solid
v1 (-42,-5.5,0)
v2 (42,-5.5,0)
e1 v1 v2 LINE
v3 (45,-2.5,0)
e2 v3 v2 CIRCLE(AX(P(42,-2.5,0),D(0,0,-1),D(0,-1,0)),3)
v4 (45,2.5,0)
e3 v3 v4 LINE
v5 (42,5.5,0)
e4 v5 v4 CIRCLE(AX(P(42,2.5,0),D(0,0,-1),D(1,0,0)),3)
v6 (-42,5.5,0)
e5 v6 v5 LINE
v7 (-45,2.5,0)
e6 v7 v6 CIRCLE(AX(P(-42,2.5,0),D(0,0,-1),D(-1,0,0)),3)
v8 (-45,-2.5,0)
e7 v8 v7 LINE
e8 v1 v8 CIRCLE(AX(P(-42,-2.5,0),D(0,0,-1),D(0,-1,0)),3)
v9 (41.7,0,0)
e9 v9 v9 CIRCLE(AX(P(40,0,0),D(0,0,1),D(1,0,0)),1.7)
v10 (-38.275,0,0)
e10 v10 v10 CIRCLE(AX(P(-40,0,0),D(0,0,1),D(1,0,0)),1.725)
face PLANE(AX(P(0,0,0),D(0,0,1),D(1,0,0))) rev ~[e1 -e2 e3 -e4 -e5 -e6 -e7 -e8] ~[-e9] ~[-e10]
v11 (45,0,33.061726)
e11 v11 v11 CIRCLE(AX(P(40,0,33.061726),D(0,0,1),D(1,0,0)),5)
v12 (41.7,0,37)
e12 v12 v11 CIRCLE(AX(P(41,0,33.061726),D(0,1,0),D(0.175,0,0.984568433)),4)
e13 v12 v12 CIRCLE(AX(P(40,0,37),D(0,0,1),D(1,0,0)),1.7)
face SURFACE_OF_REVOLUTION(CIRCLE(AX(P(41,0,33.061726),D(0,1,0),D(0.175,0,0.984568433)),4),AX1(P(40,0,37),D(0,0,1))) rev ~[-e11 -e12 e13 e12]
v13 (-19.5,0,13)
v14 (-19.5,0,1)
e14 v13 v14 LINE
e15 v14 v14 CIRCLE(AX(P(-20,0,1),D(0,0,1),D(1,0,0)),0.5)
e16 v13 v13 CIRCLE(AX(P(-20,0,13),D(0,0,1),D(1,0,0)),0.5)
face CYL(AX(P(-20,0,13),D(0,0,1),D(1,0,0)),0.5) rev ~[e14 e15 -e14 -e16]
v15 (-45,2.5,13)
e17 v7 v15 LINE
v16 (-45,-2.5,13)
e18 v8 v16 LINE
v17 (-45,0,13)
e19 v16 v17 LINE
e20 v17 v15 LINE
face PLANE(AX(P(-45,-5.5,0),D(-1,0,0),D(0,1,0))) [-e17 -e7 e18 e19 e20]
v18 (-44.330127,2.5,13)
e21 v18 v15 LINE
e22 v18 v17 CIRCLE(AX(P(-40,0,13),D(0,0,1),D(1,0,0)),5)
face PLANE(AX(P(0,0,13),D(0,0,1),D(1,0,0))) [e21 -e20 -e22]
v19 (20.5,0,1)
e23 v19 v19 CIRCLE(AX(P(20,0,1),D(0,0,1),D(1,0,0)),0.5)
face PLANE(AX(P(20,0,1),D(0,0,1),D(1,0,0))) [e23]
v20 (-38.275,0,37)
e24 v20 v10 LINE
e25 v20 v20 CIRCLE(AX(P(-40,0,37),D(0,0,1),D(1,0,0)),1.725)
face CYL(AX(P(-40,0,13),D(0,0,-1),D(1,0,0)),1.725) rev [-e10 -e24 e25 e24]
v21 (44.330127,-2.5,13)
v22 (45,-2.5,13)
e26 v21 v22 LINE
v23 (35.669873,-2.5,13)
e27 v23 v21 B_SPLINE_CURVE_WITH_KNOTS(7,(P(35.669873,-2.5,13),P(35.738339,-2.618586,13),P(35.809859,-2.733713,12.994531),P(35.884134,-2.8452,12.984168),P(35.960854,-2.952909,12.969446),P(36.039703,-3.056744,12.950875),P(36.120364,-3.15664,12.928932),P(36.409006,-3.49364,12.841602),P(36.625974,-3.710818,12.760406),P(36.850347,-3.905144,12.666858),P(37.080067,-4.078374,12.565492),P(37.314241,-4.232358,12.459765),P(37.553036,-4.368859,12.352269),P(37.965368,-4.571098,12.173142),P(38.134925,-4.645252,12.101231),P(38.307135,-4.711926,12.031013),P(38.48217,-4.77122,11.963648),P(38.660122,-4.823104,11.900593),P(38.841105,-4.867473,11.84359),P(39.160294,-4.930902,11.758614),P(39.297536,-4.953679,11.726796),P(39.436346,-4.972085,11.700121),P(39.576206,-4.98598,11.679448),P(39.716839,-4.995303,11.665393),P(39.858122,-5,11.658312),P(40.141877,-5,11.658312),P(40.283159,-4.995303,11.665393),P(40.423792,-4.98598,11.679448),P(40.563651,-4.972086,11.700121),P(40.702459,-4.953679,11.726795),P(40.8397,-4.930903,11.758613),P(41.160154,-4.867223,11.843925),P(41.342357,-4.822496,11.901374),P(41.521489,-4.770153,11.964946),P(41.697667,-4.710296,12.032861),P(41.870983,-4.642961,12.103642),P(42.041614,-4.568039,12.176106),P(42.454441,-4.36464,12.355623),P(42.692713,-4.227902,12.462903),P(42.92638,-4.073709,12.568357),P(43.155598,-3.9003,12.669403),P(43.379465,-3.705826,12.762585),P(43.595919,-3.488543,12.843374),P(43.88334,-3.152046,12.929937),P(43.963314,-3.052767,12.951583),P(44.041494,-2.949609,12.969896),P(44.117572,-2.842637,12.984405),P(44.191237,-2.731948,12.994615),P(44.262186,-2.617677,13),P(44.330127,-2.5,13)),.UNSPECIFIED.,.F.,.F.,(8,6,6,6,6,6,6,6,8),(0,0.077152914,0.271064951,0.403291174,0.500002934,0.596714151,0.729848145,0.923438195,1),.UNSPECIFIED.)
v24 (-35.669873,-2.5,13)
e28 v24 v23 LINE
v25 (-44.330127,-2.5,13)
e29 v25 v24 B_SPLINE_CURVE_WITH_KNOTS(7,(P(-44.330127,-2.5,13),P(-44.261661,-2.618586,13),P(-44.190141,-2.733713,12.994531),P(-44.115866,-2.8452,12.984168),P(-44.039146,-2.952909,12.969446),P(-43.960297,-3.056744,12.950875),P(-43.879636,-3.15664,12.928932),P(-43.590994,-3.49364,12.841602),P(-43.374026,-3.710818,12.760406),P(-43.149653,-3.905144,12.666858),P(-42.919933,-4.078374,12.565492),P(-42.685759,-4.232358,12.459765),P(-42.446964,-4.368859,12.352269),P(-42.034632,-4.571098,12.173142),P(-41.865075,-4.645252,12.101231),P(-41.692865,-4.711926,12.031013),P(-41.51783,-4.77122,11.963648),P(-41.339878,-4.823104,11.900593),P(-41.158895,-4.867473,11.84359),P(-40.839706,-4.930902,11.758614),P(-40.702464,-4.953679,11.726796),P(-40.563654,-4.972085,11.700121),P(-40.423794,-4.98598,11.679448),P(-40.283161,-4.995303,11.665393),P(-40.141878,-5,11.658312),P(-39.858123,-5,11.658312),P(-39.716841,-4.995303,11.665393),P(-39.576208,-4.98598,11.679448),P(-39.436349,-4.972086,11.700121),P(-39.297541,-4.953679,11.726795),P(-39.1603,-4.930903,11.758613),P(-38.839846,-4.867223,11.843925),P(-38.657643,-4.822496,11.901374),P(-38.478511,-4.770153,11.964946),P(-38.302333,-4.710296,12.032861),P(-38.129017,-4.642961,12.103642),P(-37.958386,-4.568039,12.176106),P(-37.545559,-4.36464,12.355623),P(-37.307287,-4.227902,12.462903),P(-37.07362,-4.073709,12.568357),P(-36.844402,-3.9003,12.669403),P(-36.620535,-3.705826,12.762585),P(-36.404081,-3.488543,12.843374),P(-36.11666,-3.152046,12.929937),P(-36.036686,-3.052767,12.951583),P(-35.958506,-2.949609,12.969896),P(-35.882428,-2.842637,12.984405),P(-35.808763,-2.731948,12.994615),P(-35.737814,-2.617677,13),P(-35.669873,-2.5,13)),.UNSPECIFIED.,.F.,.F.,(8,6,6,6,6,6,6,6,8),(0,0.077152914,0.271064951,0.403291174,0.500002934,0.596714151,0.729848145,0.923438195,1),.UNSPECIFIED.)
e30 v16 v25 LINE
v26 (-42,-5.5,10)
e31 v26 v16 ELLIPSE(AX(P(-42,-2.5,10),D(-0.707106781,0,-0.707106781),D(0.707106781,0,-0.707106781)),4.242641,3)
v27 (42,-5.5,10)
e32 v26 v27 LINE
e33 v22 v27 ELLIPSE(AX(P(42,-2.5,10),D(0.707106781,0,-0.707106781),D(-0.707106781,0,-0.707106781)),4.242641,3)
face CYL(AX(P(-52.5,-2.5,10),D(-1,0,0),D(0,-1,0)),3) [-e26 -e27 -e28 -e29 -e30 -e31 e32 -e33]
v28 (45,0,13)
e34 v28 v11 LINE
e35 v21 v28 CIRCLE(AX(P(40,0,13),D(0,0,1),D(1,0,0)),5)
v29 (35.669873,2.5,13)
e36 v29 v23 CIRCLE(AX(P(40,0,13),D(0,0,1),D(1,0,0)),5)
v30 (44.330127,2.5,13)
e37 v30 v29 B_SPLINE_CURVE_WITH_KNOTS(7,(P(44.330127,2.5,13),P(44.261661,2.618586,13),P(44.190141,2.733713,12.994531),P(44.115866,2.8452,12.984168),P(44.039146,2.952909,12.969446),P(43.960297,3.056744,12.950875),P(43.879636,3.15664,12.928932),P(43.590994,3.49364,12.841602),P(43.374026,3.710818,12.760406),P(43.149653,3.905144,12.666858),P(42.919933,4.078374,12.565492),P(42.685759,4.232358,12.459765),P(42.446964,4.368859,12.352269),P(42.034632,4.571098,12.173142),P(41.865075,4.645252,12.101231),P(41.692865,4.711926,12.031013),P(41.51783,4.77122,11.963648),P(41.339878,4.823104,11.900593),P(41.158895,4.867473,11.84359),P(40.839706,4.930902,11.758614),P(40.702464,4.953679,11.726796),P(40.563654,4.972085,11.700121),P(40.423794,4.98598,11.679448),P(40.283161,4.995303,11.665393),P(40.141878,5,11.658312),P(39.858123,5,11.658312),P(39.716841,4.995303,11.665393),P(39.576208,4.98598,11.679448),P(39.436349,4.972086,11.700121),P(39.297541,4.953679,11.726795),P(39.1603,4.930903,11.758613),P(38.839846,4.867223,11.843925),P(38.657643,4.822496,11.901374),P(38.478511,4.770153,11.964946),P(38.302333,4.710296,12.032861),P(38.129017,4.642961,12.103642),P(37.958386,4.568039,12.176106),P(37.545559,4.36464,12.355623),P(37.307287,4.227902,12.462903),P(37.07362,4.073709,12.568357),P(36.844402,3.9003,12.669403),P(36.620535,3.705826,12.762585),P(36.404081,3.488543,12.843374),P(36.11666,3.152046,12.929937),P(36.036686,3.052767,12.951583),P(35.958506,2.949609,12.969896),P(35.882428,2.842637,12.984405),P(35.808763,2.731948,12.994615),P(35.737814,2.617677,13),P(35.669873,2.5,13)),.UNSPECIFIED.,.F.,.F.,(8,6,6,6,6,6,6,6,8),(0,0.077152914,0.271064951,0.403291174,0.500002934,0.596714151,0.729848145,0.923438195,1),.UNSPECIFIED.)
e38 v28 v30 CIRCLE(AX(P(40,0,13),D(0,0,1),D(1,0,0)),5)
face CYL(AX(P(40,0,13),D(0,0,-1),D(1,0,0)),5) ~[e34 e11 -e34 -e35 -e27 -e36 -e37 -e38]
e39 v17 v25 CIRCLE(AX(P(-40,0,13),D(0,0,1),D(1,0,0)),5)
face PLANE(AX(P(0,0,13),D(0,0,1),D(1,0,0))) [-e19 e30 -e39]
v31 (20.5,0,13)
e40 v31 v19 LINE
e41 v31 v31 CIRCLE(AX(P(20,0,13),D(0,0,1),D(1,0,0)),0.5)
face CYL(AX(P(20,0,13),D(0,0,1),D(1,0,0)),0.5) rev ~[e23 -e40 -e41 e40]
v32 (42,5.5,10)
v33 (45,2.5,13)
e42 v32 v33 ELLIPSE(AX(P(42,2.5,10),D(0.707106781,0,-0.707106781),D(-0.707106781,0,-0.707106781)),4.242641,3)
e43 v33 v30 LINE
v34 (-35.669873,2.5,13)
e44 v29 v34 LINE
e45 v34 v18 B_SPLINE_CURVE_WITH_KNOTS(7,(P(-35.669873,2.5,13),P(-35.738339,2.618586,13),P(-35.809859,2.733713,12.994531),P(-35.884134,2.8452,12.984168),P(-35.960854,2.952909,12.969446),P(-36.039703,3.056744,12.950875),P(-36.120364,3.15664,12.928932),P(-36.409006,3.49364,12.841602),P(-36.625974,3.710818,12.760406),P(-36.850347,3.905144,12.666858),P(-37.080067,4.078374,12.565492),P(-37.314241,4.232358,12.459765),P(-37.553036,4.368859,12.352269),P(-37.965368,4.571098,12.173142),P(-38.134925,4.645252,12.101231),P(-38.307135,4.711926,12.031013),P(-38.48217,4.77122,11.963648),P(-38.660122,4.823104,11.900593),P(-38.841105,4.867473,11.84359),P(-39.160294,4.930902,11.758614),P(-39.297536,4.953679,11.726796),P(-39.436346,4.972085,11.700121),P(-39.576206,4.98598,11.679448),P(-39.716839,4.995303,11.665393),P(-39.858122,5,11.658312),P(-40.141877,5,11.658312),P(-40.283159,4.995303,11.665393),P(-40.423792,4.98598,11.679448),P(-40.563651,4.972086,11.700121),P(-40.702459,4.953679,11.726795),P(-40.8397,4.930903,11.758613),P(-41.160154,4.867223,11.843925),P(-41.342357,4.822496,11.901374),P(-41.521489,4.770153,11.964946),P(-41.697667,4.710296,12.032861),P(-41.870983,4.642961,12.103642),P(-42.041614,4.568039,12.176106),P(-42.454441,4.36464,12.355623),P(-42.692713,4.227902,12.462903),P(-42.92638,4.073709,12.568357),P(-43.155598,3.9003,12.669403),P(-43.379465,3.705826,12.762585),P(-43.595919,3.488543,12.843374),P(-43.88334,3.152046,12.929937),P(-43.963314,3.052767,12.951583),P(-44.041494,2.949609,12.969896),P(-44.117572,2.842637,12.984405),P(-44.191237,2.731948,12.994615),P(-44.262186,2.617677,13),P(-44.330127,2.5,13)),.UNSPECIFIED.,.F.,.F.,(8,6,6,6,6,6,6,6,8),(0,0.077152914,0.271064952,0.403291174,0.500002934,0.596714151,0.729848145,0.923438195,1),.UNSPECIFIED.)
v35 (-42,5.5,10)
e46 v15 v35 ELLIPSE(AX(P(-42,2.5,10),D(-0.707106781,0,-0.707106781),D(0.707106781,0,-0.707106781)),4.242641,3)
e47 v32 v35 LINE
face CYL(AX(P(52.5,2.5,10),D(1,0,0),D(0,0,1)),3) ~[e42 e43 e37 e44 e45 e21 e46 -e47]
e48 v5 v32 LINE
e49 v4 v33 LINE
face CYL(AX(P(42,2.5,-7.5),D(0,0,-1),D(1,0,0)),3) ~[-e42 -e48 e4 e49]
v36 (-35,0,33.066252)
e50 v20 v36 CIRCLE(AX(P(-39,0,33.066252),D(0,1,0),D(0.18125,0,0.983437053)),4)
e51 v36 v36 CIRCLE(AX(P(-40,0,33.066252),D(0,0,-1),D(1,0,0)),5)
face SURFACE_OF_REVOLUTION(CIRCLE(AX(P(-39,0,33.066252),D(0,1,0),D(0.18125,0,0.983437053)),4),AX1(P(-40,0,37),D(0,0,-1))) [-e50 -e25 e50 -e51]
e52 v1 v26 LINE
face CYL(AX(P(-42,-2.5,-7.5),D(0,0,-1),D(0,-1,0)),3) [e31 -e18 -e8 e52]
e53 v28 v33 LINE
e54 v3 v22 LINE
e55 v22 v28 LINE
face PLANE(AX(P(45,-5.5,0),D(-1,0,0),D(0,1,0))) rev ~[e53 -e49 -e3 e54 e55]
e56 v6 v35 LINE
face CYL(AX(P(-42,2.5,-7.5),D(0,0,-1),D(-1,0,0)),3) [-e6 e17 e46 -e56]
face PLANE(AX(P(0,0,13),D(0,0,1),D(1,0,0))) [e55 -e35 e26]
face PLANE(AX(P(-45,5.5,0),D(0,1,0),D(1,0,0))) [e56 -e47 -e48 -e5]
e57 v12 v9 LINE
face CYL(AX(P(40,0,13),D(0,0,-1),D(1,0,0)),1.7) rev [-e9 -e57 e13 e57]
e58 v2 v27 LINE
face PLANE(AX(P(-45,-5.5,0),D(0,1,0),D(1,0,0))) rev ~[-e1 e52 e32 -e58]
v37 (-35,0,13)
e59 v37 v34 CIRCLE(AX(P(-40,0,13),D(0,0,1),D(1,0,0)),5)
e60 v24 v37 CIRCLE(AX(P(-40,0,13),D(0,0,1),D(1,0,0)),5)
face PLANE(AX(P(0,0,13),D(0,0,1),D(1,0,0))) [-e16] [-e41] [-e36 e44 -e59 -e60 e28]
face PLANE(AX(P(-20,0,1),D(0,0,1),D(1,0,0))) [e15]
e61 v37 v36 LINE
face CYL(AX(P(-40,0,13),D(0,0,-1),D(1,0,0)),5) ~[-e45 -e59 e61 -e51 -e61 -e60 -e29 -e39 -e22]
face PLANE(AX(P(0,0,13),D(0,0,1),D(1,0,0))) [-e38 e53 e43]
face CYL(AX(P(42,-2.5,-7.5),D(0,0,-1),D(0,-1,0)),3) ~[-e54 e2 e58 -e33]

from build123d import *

# Parameters (mm, degrees)
F0_W         = 90
F0_H         = 11
F0_R         = 1.725
F0_R_2       = 1.7
F1_DEPTH     = 13
F2_R         = 5
F2_R_2       = 1.7
F3_DEPTH     = 24
F4_R         = 1.725
F5_DEPTH     = 24
F6_R         = 0.5
F7_DEPTH     = 12
F8_T1_DEPTH  = 28
F8_T6_DEPTH  = 105
F8_S7_R      = 5
F8_T8_DEPTH  = 54
F8_S9_R      = 5
F8_T10_DEPTH = 54
F8_T14_DEPTH = 105
F8_S15_R     = 5
F8_T16_DEPTH = 54
F8_S17_R     = 5
F8_T18_DEPTH = 54


# Not quite as in the source:
# - a fillet or chamfer that OpenCascade refuses, or shapes differently, is made with other operations: its cross-section is extruded or revolved along the edge and cut away or added
# - a feature names something its author has since deleted; it is built from what else it names


with BuildPart() as f1:
    # F0 (on Top) → F1 (new body)
    with BuildSketch(Plane.XY):
        Rectangle(F0_W, F0_H)
        with Locations((-40, 0)):
            Circle(F0_R, mode=Mode.SUBTRACT)
        with Locations((40, 0)):
            Circle(F0_R_2, mode=Mode.SUBTRACT)
    extrude(amount=F1_DEPTH)

    # F2 (on face) → F3 (join)
    with BuildSketch(Plane.XY.offset(13)):
        with Locations((40, 0)):
            Circle(F2_R)
        with Locations((40, 0)):
            Circle(F2_R_2, mode=Mode.SUBTRACT)
    extrude(amount=F3_DEPTH)

    # F4 (on face) → F5 (join)
    with BuildSketch(Plane.XY.offset(13)):
        with BuildLine():
            ThreePointArc((-45, 0), (-40, -5), (-35, 0))
            ThreePointArc((-35, 0), (-40, 5), (-45, 0))
        make_face()
        with Locations((-40, 0)):
            Circle(F4_R, mode=Mode.SUBTRACT)
    extrude(amount=F5_DEPTH)

    # F6 (on face) → F7 (cut)
    with BuildSketch(Plane.XY.offset(13)):
        with Locations((-20, 0)):
            Circle(F6_R)
        with Locations((20, 0)):
            Circle(F6_R)
    extrude(amount=-F7_DEPTH, mode=Mode.SUBTRACT)

    # F8: fillet of radius 3 on 6 edges, made by hand

    # F8_s2 → F8_t1 (cut)
    with BuildSketch(Plane.XY.offset(-7.5)):
        with BuildLine():
            ThreePointArc((-42, -5.5), (-44.1213203436, -4.6213203436), (-45, -2.5))
            Line((-45, -2.5), (-45, -5.5))
            Line((-45, -5.5), (-42, -5.5))
        make_face()
        with BuildLine():
            ThreePointArc((-45, 2.5), (-44.1213203436, 4.6213203436), (-42, 5.5))
            Line((-42, 5.5), (-45, 5.5))
            Line((-45, 5.5), (-45, 2.5))
        make_face()
        with BuildLine():
            ThreePointArc((42, -5.5), (44.1213203436, -4.6213203436), (45, -2.5))
            Line((45, -2.5), (45, -5.5))
            Line((45, -5.5), (42, -5.5))
        make_face()
        with BuildLine():
            ThreePointArc((45, 2.5), (44.1213203436, 4.6213203436), (42, 5.5))
            Line((42, 5.5), (45, 5.5))
            Line((45, 5.5), (45, 2.5))
        make_face()
    extrude(amount=F8_T1_DEPTH, mode=Mode.SUBTRACT)


with BuildPart() as f8_tool4:
    # F8_s5 → F8_t6 (new body)
    with BuildSketch(Plane.YZ.offset(-52.5)):
        with BuildLine():
            ThreePointArc((-5.5, 10), (-4.6213203436, 12.1213203436), (-2.5, 13))
            Line((-2.5, 13), (-5.5, 13))
            Line((-5.5, 13), (-5.5, 10))
        make_face()
    extrude(amount=F8_T6_DEPTH)

    # F8_s7 → F8_t8 (cut, symmetric)
    with BuildSketch(Plane.XY.offset(11.5)):
        with Locations((-40, 0)):
            Circle(F8_S7_R)
    extrude(amount=F8_T8_DEPTH, both=True, mode=Mode.SUBTRACT)

    # F8_s9 → F8_t10 (cut, symmetric)
    with BuildSketch(Plane.XY.offset(11.5)):
        with Locations((40, 0)):
            Circle(F8_S9_R)
    extrude(amount=F8_T10_DEPTH, both=True, mode=Mode.SUBTRACT)


with BuildPart() as f1_1:
    add(f1.part)

    # F8_t3: cut F8_tool4
    add(f8_tool4.part, mode=Mode.SUBTRACT)


with BuildPart() as f8_tool12:
    # F8_s13 → F8_t14 (new body)
    with BuildSketch(Plane.YZ.offset(52.5)):
        with BuildLine():
            ThreePointArc((2.5, 13), (4.6213203436, 12.1213203436), (5.5, 10))
            Line((5.5, 10), (5.5, 13))
            Line((5.5, 13), (2.5, 13))
        make_face()
    extrude(amount=-F8_T14_DEPTH)

    # F8_s15 → F8_t16 (cut, symmetric)
    with BuildSketch(Plane.XY.offset(11.5)):
        with Locations((-40, 0)):
            Circle(F8_S15_R)
    extrude(amount=F8_T16_DEPTH, both=True, mode=Mode.SUBTRACT)

    # F8_s17 → F8_t18 (cut, symmetric)
    with BuildSketch(Plane.XY.offset(11.5)):
        with Locations((40, 0)):
            Circle(F8_S17_R)
    extrude(amount=F8_T18_DEPTH, both=True, mode=Mode.SUBTRACT)


with BuildPart() as f1_2:
    add(f1_1.part)

    # F8_t11: cut F8_tool12
    add(f8_tool12.part, mode=Mode.SUBTRACT)

    # F9: fillet of radius 4 on 2 edges, made by hand

    # F9_s1 → F9_t2 (revolve, cut)
    with BuildSketch(Plane.XZ):
        with BuildLine():
            ThreePointArc((-38.275, 37), (-35.9259147702, 35.6255485658), (-35, 33.0662517874))
            Line((-35, 33.0662517874), (-35, 37))
            Line((-35, 37), (-38.275, 37))
        make_face()
    revolve(axis=Axis((-40, 0, 37), (0, 0, -1)), mode=Mode.SUBTRACT)

    # F9_s3 → F9_t4 (revolve, cut)
    with BuildSketch(Plane.XZ):
        with BuildLine():
            ThreePointArc((41.7, 37), (44.0659419434, 35.6307727822), (45, 33.0617262665))
            Line((45, 33.0617262665), (45, 37))
            Line((45, 37), (41.7, 37))
        make_face()
    revolve(axis=Axis((40, 0, 37), (0, 0, 1)), mode=Mode.SUBTRACT)


solid = f1_2.part
